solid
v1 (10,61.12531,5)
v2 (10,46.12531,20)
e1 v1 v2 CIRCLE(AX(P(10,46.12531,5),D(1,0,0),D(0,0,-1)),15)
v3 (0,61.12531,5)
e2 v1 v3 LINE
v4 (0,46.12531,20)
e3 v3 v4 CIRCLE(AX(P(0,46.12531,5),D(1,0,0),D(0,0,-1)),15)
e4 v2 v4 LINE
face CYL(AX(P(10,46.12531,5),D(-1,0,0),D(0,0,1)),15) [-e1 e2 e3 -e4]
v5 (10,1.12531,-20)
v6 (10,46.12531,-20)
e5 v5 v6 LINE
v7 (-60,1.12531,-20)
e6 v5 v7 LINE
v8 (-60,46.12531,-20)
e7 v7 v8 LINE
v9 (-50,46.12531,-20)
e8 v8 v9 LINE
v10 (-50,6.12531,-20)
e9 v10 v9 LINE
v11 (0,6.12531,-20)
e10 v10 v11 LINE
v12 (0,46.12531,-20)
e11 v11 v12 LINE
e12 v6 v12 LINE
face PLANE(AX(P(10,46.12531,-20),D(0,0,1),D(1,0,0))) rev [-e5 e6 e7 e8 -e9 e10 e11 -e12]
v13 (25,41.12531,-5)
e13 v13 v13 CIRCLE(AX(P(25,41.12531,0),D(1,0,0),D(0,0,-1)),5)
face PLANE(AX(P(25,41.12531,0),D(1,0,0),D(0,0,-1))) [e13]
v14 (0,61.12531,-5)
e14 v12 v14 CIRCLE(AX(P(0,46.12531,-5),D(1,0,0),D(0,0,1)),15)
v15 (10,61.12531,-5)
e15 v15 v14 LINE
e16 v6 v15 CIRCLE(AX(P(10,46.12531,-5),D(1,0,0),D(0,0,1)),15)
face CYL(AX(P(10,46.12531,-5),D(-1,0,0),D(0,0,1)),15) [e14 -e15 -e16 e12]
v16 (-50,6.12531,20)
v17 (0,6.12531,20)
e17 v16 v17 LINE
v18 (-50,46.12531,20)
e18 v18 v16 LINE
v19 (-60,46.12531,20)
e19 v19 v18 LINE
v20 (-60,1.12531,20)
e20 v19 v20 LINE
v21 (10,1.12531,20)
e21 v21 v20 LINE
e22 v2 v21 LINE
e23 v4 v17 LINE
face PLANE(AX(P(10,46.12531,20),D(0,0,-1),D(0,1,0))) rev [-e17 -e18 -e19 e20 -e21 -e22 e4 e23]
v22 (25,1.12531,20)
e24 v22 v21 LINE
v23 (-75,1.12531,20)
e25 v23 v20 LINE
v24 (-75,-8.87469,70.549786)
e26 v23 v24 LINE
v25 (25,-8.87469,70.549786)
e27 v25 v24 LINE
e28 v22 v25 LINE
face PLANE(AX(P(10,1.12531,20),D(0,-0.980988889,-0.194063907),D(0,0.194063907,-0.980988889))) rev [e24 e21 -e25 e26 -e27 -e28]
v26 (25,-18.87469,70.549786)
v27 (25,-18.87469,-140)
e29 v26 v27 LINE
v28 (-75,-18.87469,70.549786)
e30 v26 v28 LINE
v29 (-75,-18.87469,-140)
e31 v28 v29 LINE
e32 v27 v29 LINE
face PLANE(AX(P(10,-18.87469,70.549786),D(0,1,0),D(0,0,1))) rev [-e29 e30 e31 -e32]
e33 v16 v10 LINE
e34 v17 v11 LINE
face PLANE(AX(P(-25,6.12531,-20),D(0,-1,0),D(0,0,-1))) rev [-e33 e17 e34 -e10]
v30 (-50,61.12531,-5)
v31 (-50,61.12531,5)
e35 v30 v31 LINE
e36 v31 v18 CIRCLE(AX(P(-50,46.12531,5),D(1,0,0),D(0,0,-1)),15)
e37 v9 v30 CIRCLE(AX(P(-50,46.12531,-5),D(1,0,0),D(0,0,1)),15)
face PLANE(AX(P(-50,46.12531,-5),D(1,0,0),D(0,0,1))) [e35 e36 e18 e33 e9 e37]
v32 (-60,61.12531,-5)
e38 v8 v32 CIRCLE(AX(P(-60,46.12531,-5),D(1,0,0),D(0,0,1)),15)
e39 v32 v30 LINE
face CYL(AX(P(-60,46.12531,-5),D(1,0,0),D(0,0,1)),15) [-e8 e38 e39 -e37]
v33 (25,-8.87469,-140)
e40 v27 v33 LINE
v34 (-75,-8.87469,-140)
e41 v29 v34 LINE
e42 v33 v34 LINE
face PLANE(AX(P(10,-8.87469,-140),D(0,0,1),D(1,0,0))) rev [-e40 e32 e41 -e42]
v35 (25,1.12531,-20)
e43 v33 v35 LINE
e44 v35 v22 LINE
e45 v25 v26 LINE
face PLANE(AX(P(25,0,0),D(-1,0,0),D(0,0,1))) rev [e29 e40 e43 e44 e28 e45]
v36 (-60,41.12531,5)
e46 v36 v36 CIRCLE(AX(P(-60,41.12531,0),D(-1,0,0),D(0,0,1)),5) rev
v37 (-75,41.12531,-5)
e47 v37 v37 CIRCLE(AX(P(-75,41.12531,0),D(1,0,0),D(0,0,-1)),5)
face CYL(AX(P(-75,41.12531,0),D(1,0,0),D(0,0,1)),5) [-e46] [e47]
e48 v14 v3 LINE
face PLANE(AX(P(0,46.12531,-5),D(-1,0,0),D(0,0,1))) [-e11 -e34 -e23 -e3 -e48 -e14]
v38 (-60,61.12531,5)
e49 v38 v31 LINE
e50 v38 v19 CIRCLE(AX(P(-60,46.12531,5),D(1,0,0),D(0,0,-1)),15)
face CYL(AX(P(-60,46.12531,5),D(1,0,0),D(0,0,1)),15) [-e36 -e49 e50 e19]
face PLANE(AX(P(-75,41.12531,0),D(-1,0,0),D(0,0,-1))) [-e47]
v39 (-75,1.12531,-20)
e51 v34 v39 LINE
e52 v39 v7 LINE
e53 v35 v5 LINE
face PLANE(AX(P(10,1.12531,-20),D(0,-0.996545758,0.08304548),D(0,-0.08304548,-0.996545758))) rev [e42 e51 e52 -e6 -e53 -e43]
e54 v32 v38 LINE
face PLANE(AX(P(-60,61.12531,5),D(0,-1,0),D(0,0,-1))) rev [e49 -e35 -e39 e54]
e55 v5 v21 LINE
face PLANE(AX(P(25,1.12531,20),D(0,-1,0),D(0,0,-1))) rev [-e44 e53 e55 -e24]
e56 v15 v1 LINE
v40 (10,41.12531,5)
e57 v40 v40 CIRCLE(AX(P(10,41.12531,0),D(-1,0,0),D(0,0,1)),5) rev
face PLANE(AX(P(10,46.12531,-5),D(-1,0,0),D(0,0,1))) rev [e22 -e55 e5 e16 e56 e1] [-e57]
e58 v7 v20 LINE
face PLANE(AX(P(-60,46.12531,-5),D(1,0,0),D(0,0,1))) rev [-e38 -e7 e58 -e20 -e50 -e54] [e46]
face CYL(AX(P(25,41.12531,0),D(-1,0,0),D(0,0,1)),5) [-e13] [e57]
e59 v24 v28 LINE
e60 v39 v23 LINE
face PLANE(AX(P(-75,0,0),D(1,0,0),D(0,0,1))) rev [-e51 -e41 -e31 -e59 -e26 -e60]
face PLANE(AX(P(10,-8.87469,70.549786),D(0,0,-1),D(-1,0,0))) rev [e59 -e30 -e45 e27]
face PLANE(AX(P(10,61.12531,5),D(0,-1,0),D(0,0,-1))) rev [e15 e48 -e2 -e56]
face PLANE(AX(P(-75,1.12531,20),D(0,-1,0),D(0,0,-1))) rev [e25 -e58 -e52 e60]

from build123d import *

# Parameters (mm, degrees)
BOSS_EXTRUDE1_DEPTH = 10
BOSS_EXTRUDE3_DEPTH = 25
SKETCH4_R           = 5
BOSS_EXTRUDE4_DEPTH = 15
BOSS_EXTRUDE6_DEPTH = 15


with BuildPart() as part:
    # Sketch1 → Boss-Extrude1 (new body)
    with BuildSketch(Plane(origin=(0, 0, 0), x_dir=(0, 0, -1), z_dir=(1, 0, 0))):
        with BuildLine():
            Line((-5, 61.125310432), (5, 61.125310432))
            ThreePointArc((5, 61.125310432), (15.606601718, 56.73191215), (20, 46.125310432))
            Line((20, 46.125310432), (20, 1.125310432))
            Line((20, 1.125310432), (140, -8.874689568))
            Line((140, -8.874689568), (140, -18.874689568))
            Line((140, -18.874689568), (-70.549785689, -18.874689568))
            Line((-70.549785689, -18.874689568), (-70.549785689, -8.874689568))
            Line((-70.549785689, -8.874689568), (-20, 1.125310432))
            Line((-20, 1.125310432), (-20, 46.125310432))
            ThreePointArc((-20, 46.125310432), (-15.606601718, 56.73191215), (-5, 61.125310432))
        make_face()
    boss_extrude1 = extrude(amount=BOSS_EXTRUDE1_DEPTH)

    # Sketch3 → Boss-Extrude3 (add)
    with BuildSketch(Plane.ZY):
        Polygon((20, 1.125310432), (70.549785689, -8.874689568), (70.549785689, -18.874689568), (-140, -18.874689568), (-140, -8.874689568), (-20, 1.125310432), (-20, 6.125310432), (20, 6.125310432), align=None)
    boss_extrude3 = extrude(amount=BOSS_EXTRUDE3_DEPTH)

    # Sketch4 → Boss-Extrude4 (add)
    with BuildSketch(Plane(origin=(10, 0, 0), x_dir=(0, 0, -1), z_dir=(1, 0, 0))):
        with Locations((0, 41.125310432)):
            Circle(SKETCH4_R)
    boss_extrude4 = extrude(amount=BOSS_EXTRUDE4_DEPTH)

    # Sketch7 → Boss-Extrude6 (add)
    with BuildSketch(Plane(origin=(10, 0, 0), x_dir=(0, 0, -1), z_dir=(1, 0, 0))):
        Polygon((-70.549785689, -8.874689568), (-20, 1.125310432), (20, 1.125310432), (140, -8.874689568), (140, -18.874689568), (-70.549785689, -18.874689568), align=None)
    boss_extrude6 = extrude(amount=BOSS_EXTRUDE6_DEPTH)

    # Mirror2: Boss-Extrude1, Boss-Extrude3, Boss-Extrude4, Boss-Extrude6 across plane
    add(boss_extrude1.mirror(Plane(origin=(-25, 0, 0), x_dir=(0, 0, 1), z_dir=(1, 0, 0))))
    add(boss_extrude3.mirror(Plane(origin=(-25, 0, 0), x_dir=(0, 0, 1), z_dir=(1, 0, 0))))
    add(boss_extrude4.mirror(Plane(origin=(-25, 0, 0), x_dir=(0, 0, 1), z_dir=(1, 0, 0))))
    add(boss_extrude6.mirror(Plane(origin=(-25, 0, 0), x_dir=(0, 0, 1), z_dir=(1, 0, 0))))


solid = part.part
